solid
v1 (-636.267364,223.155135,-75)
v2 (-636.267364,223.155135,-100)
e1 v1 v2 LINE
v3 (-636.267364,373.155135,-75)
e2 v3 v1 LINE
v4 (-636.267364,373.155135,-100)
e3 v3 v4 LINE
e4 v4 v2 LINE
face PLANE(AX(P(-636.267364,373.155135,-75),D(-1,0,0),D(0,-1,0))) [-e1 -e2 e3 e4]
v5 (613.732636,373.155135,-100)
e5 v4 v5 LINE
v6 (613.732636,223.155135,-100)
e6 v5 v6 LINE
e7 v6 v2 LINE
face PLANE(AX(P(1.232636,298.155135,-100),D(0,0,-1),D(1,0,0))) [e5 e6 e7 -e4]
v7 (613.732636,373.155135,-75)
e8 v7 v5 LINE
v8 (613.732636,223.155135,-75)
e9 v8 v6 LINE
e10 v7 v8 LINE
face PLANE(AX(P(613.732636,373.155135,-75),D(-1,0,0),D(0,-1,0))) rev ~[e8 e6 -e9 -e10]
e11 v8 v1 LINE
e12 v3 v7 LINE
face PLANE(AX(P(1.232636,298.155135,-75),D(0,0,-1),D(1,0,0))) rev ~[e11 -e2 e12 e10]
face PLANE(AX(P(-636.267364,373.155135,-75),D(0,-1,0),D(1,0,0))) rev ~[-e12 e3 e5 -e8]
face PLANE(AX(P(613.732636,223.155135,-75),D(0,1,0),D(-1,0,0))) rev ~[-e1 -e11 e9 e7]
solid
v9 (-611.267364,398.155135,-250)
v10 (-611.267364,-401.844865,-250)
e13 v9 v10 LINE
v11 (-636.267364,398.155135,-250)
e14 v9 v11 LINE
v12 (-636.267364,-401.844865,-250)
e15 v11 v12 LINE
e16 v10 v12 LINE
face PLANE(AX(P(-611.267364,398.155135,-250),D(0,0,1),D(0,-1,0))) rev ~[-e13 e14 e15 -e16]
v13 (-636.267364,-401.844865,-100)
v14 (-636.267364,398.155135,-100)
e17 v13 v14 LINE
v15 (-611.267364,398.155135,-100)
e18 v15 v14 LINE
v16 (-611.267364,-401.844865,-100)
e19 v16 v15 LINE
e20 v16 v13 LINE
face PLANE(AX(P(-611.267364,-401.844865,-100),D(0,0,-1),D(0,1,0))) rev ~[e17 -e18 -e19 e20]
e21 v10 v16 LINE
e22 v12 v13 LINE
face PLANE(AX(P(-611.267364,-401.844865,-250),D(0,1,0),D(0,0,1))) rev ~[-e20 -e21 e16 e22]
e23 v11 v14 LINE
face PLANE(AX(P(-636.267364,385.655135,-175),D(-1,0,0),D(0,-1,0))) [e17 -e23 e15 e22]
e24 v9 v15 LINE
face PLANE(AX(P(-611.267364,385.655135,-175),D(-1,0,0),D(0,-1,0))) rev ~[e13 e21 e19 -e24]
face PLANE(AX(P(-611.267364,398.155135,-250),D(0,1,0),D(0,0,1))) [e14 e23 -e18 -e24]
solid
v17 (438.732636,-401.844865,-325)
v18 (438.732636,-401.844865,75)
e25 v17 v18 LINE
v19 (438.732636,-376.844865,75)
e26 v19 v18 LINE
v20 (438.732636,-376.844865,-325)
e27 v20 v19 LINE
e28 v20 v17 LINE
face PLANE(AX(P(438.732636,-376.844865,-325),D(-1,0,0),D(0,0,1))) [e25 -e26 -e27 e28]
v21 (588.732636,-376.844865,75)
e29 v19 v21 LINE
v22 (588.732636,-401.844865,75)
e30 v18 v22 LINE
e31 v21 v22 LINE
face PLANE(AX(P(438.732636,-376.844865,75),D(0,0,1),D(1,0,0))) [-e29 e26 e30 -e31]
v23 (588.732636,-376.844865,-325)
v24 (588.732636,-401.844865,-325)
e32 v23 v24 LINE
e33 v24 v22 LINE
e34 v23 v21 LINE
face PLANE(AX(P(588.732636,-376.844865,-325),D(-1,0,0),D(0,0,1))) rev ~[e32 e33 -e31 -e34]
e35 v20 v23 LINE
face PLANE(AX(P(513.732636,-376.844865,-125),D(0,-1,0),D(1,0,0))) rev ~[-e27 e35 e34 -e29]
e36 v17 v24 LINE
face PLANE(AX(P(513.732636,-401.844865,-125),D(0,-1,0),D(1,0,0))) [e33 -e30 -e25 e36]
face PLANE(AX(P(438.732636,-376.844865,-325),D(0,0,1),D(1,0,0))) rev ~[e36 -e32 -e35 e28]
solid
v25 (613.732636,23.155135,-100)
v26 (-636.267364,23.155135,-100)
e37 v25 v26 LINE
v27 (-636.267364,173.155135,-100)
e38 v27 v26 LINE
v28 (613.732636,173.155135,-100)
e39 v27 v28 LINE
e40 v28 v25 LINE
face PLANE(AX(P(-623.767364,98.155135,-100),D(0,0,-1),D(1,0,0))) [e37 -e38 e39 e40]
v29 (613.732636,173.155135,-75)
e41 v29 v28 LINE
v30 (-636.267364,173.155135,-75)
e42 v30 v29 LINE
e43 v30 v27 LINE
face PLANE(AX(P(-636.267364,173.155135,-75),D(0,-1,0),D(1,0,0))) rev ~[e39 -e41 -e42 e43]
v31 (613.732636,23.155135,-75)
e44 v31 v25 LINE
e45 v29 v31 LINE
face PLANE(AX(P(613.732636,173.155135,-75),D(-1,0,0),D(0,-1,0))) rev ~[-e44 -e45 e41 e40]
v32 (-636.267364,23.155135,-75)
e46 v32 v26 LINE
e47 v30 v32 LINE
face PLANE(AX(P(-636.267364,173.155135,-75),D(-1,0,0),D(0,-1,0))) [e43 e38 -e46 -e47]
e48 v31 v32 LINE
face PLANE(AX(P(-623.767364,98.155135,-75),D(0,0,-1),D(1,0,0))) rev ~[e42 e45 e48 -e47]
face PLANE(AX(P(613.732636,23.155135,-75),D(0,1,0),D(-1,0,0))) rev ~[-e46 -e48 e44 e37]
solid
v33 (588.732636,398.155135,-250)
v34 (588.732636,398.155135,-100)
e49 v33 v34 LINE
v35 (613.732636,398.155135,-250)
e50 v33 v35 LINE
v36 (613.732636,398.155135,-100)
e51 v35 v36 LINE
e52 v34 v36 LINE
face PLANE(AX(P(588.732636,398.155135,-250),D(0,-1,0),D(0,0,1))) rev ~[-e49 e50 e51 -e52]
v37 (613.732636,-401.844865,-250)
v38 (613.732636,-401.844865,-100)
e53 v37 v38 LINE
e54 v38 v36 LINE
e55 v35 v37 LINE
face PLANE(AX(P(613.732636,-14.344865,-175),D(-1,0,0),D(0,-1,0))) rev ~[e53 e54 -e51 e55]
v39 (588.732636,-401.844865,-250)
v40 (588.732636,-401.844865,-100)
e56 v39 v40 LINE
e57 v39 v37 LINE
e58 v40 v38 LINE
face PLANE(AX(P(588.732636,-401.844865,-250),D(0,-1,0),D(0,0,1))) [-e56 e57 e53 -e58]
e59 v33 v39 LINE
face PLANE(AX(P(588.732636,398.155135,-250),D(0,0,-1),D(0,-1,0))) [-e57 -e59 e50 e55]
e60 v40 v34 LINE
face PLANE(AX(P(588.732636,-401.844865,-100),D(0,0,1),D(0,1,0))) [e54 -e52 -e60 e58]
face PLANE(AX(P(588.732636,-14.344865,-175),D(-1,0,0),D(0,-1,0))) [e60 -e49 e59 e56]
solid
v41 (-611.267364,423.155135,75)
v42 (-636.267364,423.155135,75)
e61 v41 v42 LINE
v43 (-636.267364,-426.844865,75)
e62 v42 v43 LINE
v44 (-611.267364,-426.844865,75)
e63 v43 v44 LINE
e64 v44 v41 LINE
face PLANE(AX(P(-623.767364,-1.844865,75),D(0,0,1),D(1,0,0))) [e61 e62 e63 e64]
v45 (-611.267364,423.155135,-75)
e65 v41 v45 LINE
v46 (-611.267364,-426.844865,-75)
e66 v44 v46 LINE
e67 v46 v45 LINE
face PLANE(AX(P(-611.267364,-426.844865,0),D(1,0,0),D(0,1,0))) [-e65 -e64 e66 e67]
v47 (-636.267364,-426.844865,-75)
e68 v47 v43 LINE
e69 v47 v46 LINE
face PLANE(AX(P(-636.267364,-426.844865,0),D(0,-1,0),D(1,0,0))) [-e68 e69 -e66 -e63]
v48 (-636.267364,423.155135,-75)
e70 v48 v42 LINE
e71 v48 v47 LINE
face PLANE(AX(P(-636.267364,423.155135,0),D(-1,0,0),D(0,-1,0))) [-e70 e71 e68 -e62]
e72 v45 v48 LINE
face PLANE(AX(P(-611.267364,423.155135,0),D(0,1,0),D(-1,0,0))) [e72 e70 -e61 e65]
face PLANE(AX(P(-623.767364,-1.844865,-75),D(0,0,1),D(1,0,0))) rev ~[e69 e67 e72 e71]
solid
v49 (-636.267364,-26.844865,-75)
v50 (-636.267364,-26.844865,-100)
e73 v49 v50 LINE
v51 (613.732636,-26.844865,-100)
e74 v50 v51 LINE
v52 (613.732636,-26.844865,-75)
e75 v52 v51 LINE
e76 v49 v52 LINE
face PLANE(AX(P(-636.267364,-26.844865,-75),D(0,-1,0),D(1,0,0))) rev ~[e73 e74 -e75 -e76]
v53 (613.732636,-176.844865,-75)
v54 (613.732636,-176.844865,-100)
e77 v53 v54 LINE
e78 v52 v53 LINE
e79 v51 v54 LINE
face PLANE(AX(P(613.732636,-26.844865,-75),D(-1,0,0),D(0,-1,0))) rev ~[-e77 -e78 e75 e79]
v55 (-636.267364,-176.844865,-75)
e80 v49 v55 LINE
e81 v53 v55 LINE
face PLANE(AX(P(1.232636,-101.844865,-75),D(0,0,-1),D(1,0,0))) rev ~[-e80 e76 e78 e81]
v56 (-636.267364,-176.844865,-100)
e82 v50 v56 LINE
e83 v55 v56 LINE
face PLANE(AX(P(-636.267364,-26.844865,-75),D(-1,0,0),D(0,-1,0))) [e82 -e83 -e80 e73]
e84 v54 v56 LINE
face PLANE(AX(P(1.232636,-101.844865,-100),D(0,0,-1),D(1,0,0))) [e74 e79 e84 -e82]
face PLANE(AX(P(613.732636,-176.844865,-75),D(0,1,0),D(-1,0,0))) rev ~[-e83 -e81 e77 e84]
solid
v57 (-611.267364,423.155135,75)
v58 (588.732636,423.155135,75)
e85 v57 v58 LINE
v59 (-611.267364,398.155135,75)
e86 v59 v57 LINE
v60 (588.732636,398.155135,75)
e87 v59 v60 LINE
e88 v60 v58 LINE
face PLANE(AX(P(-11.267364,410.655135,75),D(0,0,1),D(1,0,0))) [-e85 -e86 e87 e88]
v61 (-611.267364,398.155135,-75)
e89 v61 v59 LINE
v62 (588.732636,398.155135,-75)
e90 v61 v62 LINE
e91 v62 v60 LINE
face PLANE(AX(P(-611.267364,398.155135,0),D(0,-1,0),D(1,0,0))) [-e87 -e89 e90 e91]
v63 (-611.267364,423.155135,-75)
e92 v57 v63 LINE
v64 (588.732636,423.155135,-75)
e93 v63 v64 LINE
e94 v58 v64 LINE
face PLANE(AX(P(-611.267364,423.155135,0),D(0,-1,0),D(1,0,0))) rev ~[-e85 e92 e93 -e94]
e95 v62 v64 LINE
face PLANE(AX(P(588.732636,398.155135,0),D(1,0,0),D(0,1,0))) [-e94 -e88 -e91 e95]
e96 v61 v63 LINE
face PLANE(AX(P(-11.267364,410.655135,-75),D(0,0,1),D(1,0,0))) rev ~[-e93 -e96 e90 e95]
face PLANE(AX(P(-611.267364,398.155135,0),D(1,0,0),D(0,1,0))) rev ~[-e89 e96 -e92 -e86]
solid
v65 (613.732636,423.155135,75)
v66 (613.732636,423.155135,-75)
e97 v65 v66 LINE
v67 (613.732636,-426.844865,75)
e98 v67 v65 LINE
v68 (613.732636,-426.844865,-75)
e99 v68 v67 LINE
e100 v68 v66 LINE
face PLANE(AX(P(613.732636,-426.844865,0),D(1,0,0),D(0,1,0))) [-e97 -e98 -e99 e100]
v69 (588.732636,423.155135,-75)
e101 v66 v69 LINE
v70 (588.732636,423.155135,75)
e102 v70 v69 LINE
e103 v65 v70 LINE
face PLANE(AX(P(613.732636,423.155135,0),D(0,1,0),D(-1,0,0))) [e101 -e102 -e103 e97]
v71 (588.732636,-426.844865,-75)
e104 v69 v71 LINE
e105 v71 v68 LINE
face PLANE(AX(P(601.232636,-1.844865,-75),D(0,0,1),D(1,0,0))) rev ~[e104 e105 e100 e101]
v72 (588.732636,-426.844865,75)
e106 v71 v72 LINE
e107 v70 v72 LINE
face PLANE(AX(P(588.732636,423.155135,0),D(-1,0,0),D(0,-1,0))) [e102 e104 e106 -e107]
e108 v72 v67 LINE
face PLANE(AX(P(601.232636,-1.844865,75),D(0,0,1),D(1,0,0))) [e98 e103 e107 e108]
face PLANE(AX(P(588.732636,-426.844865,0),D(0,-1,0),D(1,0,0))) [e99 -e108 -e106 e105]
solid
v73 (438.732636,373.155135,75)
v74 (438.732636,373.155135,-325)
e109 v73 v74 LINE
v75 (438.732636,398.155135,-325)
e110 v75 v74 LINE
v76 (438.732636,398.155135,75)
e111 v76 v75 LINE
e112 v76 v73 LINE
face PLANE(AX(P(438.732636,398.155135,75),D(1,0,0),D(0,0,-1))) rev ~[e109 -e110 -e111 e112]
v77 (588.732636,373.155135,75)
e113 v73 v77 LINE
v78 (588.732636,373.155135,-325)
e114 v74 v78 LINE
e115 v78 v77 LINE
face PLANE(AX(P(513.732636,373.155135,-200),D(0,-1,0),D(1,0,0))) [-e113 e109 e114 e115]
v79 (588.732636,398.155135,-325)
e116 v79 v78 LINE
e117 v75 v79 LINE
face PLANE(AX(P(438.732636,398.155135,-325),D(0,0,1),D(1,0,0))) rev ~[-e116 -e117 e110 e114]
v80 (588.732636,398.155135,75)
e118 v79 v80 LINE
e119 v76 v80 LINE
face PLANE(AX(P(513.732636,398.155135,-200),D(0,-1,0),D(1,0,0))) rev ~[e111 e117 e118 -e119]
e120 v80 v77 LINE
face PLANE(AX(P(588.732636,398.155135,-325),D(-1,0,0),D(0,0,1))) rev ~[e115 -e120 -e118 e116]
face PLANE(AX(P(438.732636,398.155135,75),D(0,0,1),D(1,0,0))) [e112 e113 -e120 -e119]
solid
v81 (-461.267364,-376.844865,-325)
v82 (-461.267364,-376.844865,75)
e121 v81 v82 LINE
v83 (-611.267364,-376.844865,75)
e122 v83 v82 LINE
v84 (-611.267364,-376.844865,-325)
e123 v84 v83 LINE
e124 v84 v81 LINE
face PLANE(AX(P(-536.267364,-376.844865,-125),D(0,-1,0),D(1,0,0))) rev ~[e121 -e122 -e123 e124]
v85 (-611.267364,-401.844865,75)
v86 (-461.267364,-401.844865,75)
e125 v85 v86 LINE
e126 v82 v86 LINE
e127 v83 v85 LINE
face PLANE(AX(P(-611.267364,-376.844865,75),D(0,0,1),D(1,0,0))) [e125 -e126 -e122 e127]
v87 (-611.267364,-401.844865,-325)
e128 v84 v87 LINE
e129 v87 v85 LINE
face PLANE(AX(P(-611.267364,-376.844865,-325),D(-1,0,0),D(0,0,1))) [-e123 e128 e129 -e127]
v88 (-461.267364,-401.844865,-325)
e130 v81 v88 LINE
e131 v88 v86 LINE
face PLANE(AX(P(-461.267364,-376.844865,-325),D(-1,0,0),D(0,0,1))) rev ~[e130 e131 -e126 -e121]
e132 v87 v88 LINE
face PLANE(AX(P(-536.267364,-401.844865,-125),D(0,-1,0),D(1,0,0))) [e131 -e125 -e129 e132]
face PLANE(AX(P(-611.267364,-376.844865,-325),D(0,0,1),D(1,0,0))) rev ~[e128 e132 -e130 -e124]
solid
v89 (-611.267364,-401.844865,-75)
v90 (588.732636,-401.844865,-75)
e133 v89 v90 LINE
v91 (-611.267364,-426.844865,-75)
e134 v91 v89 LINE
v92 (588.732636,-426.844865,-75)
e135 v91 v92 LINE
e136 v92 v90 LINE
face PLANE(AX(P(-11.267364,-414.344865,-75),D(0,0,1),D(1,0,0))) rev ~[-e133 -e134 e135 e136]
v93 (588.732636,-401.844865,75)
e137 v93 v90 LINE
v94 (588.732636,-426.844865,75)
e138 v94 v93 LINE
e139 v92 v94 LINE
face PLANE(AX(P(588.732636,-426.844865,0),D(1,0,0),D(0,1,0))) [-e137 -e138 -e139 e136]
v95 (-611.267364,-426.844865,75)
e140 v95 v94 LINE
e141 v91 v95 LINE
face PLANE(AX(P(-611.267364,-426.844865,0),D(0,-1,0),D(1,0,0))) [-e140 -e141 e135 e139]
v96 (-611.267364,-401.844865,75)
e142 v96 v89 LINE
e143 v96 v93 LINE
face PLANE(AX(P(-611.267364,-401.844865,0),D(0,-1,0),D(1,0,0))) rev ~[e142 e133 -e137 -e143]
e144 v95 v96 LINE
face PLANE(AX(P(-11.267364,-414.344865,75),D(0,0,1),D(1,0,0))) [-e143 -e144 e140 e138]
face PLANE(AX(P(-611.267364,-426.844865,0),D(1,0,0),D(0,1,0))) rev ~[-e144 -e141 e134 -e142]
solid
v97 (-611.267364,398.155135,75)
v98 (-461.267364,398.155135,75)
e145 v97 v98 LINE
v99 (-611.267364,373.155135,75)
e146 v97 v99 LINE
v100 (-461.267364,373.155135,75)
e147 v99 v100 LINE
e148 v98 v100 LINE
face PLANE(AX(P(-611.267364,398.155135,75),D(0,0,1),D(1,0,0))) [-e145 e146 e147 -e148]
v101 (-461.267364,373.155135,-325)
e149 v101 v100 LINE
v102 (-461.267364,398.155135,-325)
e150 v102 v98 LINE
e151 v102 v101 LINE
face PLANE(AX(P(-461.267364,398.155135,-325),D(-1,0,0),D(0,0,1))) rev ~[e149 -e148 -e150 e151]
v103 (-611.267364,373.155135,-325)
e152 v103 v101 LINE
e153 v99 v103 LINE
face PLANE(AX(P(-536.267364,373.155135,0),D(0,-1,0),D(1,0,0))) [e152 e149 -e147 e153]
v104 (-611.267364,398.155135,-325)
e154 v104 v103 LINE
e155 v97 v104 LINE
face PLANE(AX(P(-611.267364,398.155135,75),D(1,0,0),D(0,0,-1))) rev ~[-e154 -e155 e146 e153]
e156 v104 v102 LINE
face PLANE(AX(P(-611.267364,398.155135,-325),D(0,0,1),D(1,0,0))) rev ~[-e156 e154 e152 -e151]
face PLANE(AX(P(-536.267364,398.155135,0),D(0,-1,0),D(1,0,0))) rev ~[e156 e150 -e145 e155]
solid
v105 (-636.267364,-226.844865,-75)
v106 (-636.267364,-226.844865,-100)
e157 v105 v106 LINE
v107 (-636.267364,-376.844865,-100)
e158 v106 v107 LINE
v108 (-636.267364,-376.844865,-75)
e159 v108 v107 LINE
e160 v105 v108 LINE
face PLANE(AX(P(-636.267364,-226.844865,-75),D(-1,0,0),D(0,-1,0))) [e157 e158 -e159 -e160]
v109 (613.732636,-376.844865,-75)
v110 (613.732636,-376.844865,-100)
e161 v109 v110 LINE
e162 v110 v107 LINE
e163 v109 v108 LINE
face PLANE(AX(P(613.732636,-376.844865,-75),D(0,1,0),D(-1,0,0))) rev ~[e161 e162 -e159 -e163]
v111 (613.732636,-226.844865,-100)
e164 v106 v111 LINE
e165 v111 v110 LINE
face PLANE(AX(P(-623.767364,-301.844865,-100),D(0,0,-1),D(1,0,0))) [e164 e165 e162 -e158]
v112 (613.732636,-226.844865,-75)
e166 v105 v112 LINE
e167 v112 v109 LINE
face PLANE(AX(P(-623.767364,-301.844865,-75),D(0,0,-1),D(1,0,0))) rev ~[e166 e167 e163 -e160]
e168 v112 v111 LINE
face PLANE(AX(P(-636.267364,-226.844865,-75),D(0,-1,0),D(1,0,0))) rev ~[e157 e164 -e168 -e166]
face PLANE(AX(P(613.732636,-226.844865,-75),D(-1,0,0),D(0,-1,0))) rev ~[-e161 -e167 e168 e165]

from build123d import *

# Parameters (mm, degrees)
F1_DEPTH  = 75
F0_W      = 1200
F0_H      = 25
F2_DEPTH  = 75
F3_W      = 150
F3_H      = 250
F3_H_2    = 150
F4_DEPTH  = 25
F5_START  = 750
F4_FACE_W = 150
F4_FACE_H = 400
F5_DEPTH  = 25
F6_W      = 1225
F6_H      = 150
F6_W_2    = 25
F7_DEPTH  = 25
F8_W      = 25
F8_H      = 150
F8_W_2    = 775
F9_DEPTH  = 25
F10_START = -1200
F10_DEPTH = 25
F11_DEPTH = 25


# Not quite as in the source:
# - a feature names something its author has since deleted; it is built from what else it names


with BuildPart() as f1:
    # F0 (on Top) → F1 (new body, symmetric)
    with BuildSketch(Plane.XY):
        Polygon((-611.2673640251, -401.8448650837), (-611.2673640251, 398.1551349163), (-611.2673640251, 423.1551349163), (-636.2673640251, 423.1551349163), (-636.2673640251, -426.8448650837), (-611.2673640251, -426.8448650837), align=None)
    extrude(amount=F1_DEPTH, both=True)


with BuildPart() as f1b:
    # F0 (on Top) → F1, piece 2 (new body, symmetric)
    with BuildSketch(Plane.XY):
        Polygon((588.7326359749, 423.1551349163), (588.7326359749, 398.1551349163), (588.7326359749, -401.8448650837), (588.7326359749, -426.8448650837), (613.7326359749, -426.8448650837), (613.7326359749, 423.1551349163), align=None)
    extrude(amount=F1_DEPTH, both=True)


with BuildPart() as f2:
    # F0 (on Top) → F2 (new body, symmetric)
    with BuildSketch(Plane.XY):
        with Locations((-11.2673640251, 410.6551349163)):
            Rectangle(F0_W, F0_H)
    extrude(amount=F2_DEPTH, both=True)


with BuildPart() as f2b:
    # F0 (on Top) → F2, piece 2 (new body, symmetric)
    with BuildSketch(Plane.XY):
        with Locations((-11.2673640251, -414.3448650837)):
            Rectangle(F0_W, F0_H)
    extrude(amount=F2_DEPTH, both=True)


with BuildPart() as f4:
    # F3 (on face) → F4 (new body)
    with BuildSketch(Plane.XZ.offset(-398.1551349163)):
        with Locations((513.7326359749, -200)):
            Rectangle(F3_W, F3_H)
        with Locations((513.7326359749, 0)):
            Rectangle(F3_W, F3_H_2)
    extrude(amount=F4_DEPTH)


with BuildPart() as f4b:
    # F3 (on face) → F4, piece 2 (new body)
    with BuildSketch(Plane.XZ.offset(-398.1551349163)):
        with Locations((-536.2673640251, 0)):
            Rectangle(F3_W, F3_H_2)
        with Locations((-536.2673640251, -200)):
            Rectangle(F3_W, F3_H)
    extrude(amount=F4_DEPTH)


with BuildPart() as f5:
    # F4_face (on face) → F5 (new body)
    with BuildSketch(Plane(origin=(-536.2673640251, 373.1551349163, -125), x_dir=(1, 0, 0), z_dir=(0, -1, 0)).offset(F5_START)):
        Rectangle(F4_FACE_W, F4_FACE_H)
    extrude(amount=F5_DEPTH)


with BuildPart() as f5b:
    # F4_face (on face) → F5, piece 2 (new body)
    with BuildSketch(Plane(origin=(-536.2673640251, 373.1551349163, -125), x_dir=(1, 0, 0), z_dir=(0, -1, 0)).offset(F5_START)):
        with Locations((1050, 0)):
            Rectangle(F4_FACE_W, F4_FACE_H)
    extrude(amount=F5_DEPTH)


with BuildPart() as f7:
    # F6 (on face) → F7 (new body)
    with BuildSketch(Plane(origin=(0, 0, -75), x_dir=(1, 0, 0), z_dir=(0, 0, -1))):
        with Locations((1.2326359749, -298.1551349163)):
            Rectangle(F6_W, F6_H)
        with Locations((-623.7673640251, -298.1551349163)):
            Rectangle(F6_W_2, F6_H)
    extrude(amount=F7_DEPTH)


with BuildPart() as f7b:
    # F6 (on face) → F7, piece 2 (new body)
    with BuildSketch(Plane(origin=(0, 0, -75), x_dir=(1, 0, 0), z_dir=(0, 0, -1))):
        with Locations((-623.7673640251, 301.8448650837)):
            Rectangle(F6_W_2, F6_H)
        with Locations((1.2326359749, 301.8448650837)):
            Rectangle(F6_W, F6_H)
    extrude(amount=F7_DEPTH)


with BuildPart() as f9:
    # F8 (on face) → F9 (new body)
    with BuildSketch(Plane(origin=(-611.2673640251, 0, 0), x_dir=(0, -1, 0), z_dir=(-1, 0, 0))):
        with Locations((-385.6551349163, -175)):
            Rectangle(F8_W, F8_H)
        with Locations((14.3448650837, -175)):
            Rectangle(F8_W_2, F8_H)
    extrude(amount=F9_DEPTH)


with BuildPart() as f10:
    # F8 (on face) → F10 (new body)
    with BuildSketch(Plane(origin=(-611.2673640251, 0, 0), x_dir=(0, -1, 0), z_dir=(-1, 0, 0)).offset(F10_START)):
        with Locations((14.3448650837, -175)):
            Rectangle(F8_W_2, F8_H)
        with Locations((-385.6551349163, -175)):
            Rectangle(F8_W, F8_H)
    extrude(amount=-F10_DEPTH)


with BuildPart() as f11:
    # F6 (on face) → F11 (new body)
    with BuildSketch(Plane(origin=(0, 0, -75), x_dir=(1, 0, 0), z_dir=(0, 0, -1))):
        with Locations((1.2326359749, 101.8448650837)):
            Rectangle(F6_W, F6_H)
        with Locations((-623.7673640251, 101.8448650837)):
            Rectangle(F6_W_2, F6_H)
    extrude(amount=F11_DEPTH)


with BuildPart() as f11b:
    # F6 (on face) → F11, piece 2 (new body)
    with BuildSketch(Plane(origin=(0, 0, -75), x_dir=(1, 0, 0), z_dir=(0, 0, -1))):
        with Locations((-623.7673640251, -98.1551349163)):
            Rectangle(F6_W_2, F6_H)
        with Locations((1.2326359749, -98.1551349163)):
            Rectangle(F6_W, F6_H)
    extrude(amount=F11_DEPTH)


solid = Compound([f1.part, f1b.part, f2.part, f2b.part, f4.part, f4b.part, f5.part, f5b.part, f7.part, f7b.part, f9.part, f10.part, f11.part, f11b.part])
